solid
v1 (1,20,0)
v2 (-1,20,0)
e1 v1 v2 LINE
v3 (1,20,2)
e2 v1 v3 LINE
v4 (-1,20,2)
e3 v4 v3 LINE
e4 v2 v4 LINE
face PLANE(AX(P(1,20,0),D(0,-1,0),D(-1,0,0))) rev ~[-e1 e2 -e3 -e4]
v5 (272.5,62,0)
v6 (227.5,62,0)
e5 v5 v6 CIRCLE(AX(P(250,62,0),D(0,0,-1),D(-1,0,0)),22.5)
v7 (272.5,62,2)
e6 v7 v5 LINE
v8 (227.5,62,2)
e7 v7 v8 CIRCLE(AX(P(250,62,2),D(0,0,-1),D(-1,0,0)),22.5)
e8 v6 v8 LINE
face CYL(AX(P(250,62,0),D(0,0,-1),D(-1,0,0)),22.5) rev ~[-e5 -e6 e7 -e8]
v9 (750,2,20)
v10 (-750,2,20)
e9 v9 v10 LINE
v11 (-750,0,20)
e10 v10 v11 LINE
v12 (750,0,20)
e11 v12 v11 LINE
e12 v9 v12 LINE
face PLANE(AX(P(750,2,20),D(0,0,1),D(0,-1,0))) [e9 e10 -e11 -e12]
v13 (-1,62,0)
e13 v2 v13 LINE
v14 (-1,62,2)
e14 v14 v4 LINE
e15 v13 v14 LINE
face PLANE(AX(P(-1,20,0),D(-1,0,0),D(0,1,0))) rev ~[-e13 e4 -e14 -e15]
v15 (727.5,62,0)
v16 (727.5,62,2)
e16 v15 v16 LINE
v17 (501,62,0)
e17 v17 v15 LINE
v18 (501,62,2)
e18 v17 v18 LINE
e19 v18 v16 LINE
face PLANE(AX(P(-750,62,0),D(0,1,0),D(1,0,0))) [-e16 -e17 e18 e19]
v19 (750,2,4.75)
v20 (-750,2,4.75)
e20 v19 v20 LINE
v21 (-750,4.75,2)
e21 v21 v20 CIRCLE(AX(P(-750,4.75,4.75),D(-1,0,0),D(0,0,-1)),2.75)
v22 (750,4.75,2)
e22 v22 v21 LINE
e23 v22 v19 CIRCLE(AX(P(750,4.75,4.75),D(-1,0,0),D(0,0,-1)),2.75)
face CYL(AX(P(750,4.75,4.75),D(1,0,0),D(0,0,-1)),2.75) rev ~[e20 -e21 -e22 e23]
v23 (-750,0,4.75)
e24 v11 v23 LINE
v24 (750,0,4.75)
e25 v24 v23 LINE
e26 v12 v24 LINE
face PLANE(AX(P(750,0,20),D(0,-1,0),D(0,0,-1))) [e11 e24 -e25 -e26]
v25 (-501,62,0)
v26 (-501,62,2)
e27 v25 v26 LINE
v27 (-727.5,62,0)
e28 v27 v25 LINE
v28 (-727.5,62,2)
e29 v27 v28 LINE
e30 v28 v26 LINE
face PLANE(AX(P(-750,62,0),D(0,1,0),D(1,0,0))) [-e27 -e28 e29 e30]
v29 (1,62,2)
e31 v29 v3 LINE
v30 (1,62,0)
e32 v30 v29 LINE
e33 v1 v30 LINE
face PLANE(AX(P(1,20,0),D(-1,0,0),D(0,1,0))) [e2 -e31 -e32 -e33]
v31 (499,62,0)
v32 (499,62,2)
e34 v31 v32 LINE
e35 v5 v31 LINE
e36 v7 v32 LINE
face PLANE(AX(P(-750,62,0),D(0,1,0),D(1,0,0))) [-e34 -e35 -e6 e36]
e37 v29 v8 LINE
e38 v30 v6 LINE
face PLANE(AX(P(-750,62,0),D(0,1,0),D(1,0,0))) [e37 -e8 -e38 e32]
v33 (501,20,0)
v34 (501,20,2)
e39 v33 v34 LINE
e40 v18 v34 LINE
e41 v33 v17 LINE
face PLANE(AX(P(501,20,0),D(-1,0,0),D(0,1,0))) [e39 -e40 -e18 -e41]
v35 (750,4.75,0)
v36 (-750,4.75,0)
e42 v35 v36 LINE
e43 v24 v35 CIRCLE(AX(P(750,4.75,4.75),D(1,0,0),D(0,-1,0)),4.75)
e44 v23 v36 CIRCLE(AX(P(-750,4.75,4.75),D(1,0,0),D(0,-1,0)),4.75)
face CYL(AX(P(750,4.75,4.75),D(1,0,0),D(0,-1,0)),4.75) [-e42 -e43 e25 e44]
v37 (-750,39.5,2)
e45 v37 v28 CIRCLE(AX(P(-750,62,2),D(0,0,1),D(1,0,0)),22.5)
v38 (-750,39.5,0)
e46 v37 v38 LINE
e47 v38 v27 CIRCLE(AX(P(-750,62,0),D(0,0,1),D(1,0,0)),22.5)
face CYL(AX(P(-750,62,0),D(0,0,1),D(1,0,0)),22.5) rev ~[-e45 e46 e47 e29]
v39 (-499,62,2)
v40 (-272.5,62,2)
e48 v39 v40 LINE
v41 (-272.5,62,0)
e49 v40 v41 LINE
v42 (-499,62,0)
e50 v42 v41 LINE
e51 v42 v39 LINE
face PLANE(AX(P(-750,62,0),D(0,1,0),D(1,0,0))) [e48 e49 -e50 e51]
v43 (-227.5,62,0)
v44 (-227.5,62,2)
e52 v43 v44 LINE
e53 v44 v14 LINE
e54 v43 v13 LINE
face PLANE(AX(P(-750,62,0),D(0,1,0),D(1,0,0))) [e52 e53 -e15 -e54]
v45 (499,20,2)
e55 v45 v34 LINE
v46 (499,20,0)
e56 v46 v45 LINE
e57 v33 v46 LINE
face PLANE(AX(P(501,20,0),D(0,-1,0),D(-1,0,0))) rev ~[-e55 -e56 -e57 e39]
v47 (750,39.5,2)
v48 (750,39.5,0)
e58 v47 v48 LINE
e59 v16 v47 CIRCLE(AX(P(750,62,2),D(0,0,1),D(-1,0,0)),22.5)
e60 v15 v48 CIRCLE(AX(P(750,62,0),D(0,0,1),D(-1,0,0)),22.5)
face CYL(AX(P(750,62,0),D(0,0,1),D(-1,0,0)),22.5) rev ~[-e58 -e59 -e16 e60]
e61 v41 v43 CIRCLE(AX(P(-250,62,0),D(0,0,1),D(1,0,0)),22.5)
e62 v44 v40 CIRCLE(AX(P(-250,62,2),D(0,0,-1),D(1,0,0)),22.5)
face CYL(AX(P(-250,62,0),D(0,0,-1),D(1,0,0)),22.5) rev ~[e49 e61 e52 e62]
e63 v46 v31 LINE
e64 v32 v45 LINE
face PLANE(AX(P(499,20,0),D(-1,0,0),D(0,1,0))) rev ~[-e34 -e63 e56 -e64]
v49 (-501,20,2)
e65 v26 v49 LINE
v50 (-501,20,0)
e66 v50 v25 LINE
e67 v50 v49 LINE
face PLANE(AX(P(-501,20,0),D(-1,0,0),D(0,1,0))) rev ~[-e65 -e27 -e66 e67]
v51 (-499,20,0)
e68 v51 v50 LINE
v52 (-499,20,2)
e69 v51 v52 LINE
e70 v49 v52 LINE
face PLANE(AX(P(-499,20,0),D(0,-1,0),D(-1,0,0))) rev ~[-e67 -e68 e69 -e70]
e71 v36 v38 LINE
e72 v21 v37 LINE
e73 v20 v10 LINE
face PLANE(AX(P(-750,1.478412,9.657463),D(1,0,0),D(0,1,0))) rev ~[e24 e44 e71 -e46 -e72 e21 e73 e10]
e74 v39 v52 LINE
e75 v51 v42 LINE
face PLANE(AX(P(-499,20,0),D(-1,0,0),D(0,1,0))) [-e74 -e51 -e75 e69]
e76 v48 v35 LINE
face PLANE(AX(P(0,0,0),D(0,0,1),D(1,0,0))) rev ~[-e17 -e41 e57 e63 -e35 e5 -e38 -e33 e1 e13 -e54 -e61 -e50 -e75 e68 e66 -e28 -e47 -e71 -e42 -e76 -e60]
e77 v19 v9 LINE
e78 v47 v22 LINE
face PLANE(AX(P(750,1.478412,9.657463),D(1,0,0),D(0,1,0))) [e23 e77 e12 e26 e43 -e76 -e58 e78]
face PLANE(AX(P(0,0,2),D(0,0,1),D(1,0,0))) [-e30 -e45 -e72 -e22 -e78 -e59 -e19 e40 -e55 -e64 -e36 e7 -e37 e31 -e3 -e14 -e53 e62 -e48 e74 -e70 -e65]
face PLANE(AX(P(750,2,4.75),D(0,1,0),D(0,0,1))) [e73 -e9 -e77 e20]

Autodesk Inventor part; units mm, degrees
ref_plane "YZ Plane" through (0, 0, 0) normal (1, 0, 0) x (0, 1, 0)
ref_plane "XZ Plane" through (0, 0, 0) normal (0, 1, 0) x (-1, 0, 0)
ref_plane "XY Plane" through (0, 0, 0) normal (0, 0, 1) x (1, 0, 0)
sketch "Sketch1" plane through (0, 0, 0) normal (0, 0, 1) x (1, 0, 0)
  line L0 (-750, 62) -> (750, 62)
  line L1 (750, 62) -> (750, 0)
  line L2 (750, 0) -> (-750, 0)
  line L3 (-750, 0) -> (-750, 62)
  point P0 (0, 0)
  point P1 (0, 0)
  dimension "d0" = 1500
  dimension "d1" = 62
extrude "Plate1" add sketch "Sketch1" along normal blind 2
sketch "Sketch2" plane through (750, 2, 0) normal (0, -1, 0) x (1, 0, 0)
  line L0 (-1500, 0) -> (0, 0)
  line L1 (0, 0) -> (0, 20)
  line L2 (0, 20) -> (-1500, 20)
  line L3 (-1500, 20) -> (-1500, 0)
edge flange "Flange1" height 20 angle 90 thickness 2 bend radius 2.75 thickness toward (0, -1, 0) relief round relief width 2 relief depth 1 edges at (0, 0, 2) wall of the first edge with corners at (-750, 2, 0) (750, 2, 0) (750, 2, 20) (-750, 2, 20)
bend "Bend1"
corner "Corner1"
sketch "Sketch5" plane through (0, 0, 0) normal (0, 0, -1) x (-1, 0, 0)
  line L0 (750, 62) -> (-750, 62) projected
  line L1 (-1, 20) -> (-1, 62)
  line L2 (750, 0) -> (-750, 0) projected
  line L3 (-1, 20) -> (1, 20)
  line L4 (1, 20) -> (1, 62)
  point P0 (0, 0)
  point P1 (0, 20)
  point P2 (0, 0)
  dimension "d27" = 2
  dimension "d28" = 20
extrude "Extrusion1" cut sketch "Sketch5" against normal through all
pattern_linear "Rectangular Pattern1" count 3 spacing 500 along (1, 0, 0) of "Extrusion1" first direction both ways yes
sketch "Sketch6" plane through (0, 0, 0) normal (0, 0, -1) x (-1, 0, 0)
  line L0 (-750, 62) -> (-750, 4.75) projected
  circle A0 centre (-750, 62) radius 22.5
  line L1 (-750, 62) -> (750, 62) projected
  line L2 (-1, 20) -> (-1, 62) projected
  line L3 (-499, 62) -> (-499, 20) projected
  line L4 (-1, 20) -> (-499, 20) construction
  circle A1 centre (-250, 62) radius 22.5
  point P0 (0, 0)
  point P1 (-727.5, 62)
  point P2 (-750, 39.5)
  point P3 (-250, 20)
  dimension "d24" = 45
extrude "Extrusion2" cut sketch "Sketch6" along normal mid plane 30 contours L1 A0 L0 | A1 L1 | L1 A1 picked at (-748.3311, 47.188)
mirror "Mirror1" about plane through (0, 0, 0) normal (1, 0, 0) of "Extrusion2"
sketch "Sketch7" plane through (0, 0, 2) normal (0, 0, 1) x (1, 0, 0)
  arc A0 (-750, 39.5) -> (-727.5, 62) centre (-750, 62) ccw projected
  line L0 (-750, 4.75) -> (-750, 39.5) projected
  line L1 (-750, 4.75) -> (750, 4.75) projected
  line L2 (750, 39.5) -> (750, 4.75) projected
  arc A1 (727.5, 62) -> (750, 39.5) centre (750, 62) ccw projected
  line L3 (501, 62) -> (727.5, 62) projected
  line L4 (501, 62) -> (501, 20) projected
  line L5 (501, 20) -> (499, 20) projected
  line L6 (499, 20) -> (499, 62) projected
  line L7 (1, 62) -> (227.5, 62) projected
  line L8 (1, 62) -> (1, 20) projected
  line L9 (1, 20) -> (-1, 20) projected
  line L10 (-1, 20) -> (-1, 62) projected
  line L11 (-499, 62) -> (-272.5, 62) projected
  line L12 (-499, 62) -> (-499, 20) projected
  line L13 (-499, 20) -> (-501, 20) projected
  line L14 (-501, 20) -> (-501, 62) projected
  line L15 (-727.5, 62) -> (-501, 62) projected
  line L16 (650, 4.75) -> (650, 62) construction
  line L17 (-750, 4.75) -> (750, 4.75) projected
  circle A2 centre (650, 33.375) radius 5
  line L18 (272.5, 62) -> (499, 62) projected
  arc A3 (227.5, 62) -> (272.5, 62) centre (250, 62) ccw projected
  line L19 (-227.5, 62) -> (-1, 62) projected
  arc A4 (-272.5, 62) -> (-227.5, 62) centre (-250, 62) ccw projected
  point P0 (0, 0)
  dimension "d29" = 100
  dimension "d30" = 10
extrude "Extrusion3" [suppressed]
mirror "Mirror2" [suppressed]
sketch "Sketch8" plane through (0, 0, 2) normal (0, 0, 1) x (1, 0, 0)
  line L0 (494, 57) -> (494, 45) construction
  line L1 (494, 45) -> (294, 45) construction
  line L2 (294, 45) -> (294, 57) construction
  line L3 (294, 57) -> (494, 57) construction
  line L4 (501, 62) -> (727.5, 62) projected
  line L5 (272.5, 62) -> (499, 62) projected
  point P0 (0, 0)
  dimension "d33" = 200
  dimension "d34" = 12
  dimension "d37" = 5
  dimension "d38" = 5
mark "Mark2"
equation "\"d28\" = РЕБРА_полка"
equation "\"d1\" = БОРТ_стрингер_3_высота"
equation "\"d27\" = d18"
equation "\"d2\" = Thickness"
equation "\"d3\" = BendReliefWidth"
equation "\"d4\" = BendReliefDepth"
equation "\"d5\" = MinimumRemnant"
equation "\"d6\" = TransitionRadius"
equation "\"d9\" = BendRadius"
equation "\"d10\" = CornerReliefSize"
equation "\"d11\" = GapSize"
equation "\"d12\" = JacobiRadiusSize"
equation "\"BendReliefWidth\" = Thickness"
equation "\"BendReliefDepth\" = 0.5 * Thickness"
equation "\"CornerReliefSize\" = 4 * Thickness"
equation "\"MinimumRemnant\" = 2 * Thickness"
equation "\"TransitionRadius\" = BendRadius"
equation "\"JacobiRadiusSize\" = BendRadius"
equation "\"GapSize\" = Thickness"
equation "\"d18\" = Thickness"
equation "\"БОРТ_стрингер_3_высота\" = 62"
equation "\"Thickness\" = 2"
equation "\"BendRadius\" = 2.75"
equation "\"РЕБРА_полка\" = 20"
properties part number "MSC 316 stringer board #" material "Stainless Steel"
